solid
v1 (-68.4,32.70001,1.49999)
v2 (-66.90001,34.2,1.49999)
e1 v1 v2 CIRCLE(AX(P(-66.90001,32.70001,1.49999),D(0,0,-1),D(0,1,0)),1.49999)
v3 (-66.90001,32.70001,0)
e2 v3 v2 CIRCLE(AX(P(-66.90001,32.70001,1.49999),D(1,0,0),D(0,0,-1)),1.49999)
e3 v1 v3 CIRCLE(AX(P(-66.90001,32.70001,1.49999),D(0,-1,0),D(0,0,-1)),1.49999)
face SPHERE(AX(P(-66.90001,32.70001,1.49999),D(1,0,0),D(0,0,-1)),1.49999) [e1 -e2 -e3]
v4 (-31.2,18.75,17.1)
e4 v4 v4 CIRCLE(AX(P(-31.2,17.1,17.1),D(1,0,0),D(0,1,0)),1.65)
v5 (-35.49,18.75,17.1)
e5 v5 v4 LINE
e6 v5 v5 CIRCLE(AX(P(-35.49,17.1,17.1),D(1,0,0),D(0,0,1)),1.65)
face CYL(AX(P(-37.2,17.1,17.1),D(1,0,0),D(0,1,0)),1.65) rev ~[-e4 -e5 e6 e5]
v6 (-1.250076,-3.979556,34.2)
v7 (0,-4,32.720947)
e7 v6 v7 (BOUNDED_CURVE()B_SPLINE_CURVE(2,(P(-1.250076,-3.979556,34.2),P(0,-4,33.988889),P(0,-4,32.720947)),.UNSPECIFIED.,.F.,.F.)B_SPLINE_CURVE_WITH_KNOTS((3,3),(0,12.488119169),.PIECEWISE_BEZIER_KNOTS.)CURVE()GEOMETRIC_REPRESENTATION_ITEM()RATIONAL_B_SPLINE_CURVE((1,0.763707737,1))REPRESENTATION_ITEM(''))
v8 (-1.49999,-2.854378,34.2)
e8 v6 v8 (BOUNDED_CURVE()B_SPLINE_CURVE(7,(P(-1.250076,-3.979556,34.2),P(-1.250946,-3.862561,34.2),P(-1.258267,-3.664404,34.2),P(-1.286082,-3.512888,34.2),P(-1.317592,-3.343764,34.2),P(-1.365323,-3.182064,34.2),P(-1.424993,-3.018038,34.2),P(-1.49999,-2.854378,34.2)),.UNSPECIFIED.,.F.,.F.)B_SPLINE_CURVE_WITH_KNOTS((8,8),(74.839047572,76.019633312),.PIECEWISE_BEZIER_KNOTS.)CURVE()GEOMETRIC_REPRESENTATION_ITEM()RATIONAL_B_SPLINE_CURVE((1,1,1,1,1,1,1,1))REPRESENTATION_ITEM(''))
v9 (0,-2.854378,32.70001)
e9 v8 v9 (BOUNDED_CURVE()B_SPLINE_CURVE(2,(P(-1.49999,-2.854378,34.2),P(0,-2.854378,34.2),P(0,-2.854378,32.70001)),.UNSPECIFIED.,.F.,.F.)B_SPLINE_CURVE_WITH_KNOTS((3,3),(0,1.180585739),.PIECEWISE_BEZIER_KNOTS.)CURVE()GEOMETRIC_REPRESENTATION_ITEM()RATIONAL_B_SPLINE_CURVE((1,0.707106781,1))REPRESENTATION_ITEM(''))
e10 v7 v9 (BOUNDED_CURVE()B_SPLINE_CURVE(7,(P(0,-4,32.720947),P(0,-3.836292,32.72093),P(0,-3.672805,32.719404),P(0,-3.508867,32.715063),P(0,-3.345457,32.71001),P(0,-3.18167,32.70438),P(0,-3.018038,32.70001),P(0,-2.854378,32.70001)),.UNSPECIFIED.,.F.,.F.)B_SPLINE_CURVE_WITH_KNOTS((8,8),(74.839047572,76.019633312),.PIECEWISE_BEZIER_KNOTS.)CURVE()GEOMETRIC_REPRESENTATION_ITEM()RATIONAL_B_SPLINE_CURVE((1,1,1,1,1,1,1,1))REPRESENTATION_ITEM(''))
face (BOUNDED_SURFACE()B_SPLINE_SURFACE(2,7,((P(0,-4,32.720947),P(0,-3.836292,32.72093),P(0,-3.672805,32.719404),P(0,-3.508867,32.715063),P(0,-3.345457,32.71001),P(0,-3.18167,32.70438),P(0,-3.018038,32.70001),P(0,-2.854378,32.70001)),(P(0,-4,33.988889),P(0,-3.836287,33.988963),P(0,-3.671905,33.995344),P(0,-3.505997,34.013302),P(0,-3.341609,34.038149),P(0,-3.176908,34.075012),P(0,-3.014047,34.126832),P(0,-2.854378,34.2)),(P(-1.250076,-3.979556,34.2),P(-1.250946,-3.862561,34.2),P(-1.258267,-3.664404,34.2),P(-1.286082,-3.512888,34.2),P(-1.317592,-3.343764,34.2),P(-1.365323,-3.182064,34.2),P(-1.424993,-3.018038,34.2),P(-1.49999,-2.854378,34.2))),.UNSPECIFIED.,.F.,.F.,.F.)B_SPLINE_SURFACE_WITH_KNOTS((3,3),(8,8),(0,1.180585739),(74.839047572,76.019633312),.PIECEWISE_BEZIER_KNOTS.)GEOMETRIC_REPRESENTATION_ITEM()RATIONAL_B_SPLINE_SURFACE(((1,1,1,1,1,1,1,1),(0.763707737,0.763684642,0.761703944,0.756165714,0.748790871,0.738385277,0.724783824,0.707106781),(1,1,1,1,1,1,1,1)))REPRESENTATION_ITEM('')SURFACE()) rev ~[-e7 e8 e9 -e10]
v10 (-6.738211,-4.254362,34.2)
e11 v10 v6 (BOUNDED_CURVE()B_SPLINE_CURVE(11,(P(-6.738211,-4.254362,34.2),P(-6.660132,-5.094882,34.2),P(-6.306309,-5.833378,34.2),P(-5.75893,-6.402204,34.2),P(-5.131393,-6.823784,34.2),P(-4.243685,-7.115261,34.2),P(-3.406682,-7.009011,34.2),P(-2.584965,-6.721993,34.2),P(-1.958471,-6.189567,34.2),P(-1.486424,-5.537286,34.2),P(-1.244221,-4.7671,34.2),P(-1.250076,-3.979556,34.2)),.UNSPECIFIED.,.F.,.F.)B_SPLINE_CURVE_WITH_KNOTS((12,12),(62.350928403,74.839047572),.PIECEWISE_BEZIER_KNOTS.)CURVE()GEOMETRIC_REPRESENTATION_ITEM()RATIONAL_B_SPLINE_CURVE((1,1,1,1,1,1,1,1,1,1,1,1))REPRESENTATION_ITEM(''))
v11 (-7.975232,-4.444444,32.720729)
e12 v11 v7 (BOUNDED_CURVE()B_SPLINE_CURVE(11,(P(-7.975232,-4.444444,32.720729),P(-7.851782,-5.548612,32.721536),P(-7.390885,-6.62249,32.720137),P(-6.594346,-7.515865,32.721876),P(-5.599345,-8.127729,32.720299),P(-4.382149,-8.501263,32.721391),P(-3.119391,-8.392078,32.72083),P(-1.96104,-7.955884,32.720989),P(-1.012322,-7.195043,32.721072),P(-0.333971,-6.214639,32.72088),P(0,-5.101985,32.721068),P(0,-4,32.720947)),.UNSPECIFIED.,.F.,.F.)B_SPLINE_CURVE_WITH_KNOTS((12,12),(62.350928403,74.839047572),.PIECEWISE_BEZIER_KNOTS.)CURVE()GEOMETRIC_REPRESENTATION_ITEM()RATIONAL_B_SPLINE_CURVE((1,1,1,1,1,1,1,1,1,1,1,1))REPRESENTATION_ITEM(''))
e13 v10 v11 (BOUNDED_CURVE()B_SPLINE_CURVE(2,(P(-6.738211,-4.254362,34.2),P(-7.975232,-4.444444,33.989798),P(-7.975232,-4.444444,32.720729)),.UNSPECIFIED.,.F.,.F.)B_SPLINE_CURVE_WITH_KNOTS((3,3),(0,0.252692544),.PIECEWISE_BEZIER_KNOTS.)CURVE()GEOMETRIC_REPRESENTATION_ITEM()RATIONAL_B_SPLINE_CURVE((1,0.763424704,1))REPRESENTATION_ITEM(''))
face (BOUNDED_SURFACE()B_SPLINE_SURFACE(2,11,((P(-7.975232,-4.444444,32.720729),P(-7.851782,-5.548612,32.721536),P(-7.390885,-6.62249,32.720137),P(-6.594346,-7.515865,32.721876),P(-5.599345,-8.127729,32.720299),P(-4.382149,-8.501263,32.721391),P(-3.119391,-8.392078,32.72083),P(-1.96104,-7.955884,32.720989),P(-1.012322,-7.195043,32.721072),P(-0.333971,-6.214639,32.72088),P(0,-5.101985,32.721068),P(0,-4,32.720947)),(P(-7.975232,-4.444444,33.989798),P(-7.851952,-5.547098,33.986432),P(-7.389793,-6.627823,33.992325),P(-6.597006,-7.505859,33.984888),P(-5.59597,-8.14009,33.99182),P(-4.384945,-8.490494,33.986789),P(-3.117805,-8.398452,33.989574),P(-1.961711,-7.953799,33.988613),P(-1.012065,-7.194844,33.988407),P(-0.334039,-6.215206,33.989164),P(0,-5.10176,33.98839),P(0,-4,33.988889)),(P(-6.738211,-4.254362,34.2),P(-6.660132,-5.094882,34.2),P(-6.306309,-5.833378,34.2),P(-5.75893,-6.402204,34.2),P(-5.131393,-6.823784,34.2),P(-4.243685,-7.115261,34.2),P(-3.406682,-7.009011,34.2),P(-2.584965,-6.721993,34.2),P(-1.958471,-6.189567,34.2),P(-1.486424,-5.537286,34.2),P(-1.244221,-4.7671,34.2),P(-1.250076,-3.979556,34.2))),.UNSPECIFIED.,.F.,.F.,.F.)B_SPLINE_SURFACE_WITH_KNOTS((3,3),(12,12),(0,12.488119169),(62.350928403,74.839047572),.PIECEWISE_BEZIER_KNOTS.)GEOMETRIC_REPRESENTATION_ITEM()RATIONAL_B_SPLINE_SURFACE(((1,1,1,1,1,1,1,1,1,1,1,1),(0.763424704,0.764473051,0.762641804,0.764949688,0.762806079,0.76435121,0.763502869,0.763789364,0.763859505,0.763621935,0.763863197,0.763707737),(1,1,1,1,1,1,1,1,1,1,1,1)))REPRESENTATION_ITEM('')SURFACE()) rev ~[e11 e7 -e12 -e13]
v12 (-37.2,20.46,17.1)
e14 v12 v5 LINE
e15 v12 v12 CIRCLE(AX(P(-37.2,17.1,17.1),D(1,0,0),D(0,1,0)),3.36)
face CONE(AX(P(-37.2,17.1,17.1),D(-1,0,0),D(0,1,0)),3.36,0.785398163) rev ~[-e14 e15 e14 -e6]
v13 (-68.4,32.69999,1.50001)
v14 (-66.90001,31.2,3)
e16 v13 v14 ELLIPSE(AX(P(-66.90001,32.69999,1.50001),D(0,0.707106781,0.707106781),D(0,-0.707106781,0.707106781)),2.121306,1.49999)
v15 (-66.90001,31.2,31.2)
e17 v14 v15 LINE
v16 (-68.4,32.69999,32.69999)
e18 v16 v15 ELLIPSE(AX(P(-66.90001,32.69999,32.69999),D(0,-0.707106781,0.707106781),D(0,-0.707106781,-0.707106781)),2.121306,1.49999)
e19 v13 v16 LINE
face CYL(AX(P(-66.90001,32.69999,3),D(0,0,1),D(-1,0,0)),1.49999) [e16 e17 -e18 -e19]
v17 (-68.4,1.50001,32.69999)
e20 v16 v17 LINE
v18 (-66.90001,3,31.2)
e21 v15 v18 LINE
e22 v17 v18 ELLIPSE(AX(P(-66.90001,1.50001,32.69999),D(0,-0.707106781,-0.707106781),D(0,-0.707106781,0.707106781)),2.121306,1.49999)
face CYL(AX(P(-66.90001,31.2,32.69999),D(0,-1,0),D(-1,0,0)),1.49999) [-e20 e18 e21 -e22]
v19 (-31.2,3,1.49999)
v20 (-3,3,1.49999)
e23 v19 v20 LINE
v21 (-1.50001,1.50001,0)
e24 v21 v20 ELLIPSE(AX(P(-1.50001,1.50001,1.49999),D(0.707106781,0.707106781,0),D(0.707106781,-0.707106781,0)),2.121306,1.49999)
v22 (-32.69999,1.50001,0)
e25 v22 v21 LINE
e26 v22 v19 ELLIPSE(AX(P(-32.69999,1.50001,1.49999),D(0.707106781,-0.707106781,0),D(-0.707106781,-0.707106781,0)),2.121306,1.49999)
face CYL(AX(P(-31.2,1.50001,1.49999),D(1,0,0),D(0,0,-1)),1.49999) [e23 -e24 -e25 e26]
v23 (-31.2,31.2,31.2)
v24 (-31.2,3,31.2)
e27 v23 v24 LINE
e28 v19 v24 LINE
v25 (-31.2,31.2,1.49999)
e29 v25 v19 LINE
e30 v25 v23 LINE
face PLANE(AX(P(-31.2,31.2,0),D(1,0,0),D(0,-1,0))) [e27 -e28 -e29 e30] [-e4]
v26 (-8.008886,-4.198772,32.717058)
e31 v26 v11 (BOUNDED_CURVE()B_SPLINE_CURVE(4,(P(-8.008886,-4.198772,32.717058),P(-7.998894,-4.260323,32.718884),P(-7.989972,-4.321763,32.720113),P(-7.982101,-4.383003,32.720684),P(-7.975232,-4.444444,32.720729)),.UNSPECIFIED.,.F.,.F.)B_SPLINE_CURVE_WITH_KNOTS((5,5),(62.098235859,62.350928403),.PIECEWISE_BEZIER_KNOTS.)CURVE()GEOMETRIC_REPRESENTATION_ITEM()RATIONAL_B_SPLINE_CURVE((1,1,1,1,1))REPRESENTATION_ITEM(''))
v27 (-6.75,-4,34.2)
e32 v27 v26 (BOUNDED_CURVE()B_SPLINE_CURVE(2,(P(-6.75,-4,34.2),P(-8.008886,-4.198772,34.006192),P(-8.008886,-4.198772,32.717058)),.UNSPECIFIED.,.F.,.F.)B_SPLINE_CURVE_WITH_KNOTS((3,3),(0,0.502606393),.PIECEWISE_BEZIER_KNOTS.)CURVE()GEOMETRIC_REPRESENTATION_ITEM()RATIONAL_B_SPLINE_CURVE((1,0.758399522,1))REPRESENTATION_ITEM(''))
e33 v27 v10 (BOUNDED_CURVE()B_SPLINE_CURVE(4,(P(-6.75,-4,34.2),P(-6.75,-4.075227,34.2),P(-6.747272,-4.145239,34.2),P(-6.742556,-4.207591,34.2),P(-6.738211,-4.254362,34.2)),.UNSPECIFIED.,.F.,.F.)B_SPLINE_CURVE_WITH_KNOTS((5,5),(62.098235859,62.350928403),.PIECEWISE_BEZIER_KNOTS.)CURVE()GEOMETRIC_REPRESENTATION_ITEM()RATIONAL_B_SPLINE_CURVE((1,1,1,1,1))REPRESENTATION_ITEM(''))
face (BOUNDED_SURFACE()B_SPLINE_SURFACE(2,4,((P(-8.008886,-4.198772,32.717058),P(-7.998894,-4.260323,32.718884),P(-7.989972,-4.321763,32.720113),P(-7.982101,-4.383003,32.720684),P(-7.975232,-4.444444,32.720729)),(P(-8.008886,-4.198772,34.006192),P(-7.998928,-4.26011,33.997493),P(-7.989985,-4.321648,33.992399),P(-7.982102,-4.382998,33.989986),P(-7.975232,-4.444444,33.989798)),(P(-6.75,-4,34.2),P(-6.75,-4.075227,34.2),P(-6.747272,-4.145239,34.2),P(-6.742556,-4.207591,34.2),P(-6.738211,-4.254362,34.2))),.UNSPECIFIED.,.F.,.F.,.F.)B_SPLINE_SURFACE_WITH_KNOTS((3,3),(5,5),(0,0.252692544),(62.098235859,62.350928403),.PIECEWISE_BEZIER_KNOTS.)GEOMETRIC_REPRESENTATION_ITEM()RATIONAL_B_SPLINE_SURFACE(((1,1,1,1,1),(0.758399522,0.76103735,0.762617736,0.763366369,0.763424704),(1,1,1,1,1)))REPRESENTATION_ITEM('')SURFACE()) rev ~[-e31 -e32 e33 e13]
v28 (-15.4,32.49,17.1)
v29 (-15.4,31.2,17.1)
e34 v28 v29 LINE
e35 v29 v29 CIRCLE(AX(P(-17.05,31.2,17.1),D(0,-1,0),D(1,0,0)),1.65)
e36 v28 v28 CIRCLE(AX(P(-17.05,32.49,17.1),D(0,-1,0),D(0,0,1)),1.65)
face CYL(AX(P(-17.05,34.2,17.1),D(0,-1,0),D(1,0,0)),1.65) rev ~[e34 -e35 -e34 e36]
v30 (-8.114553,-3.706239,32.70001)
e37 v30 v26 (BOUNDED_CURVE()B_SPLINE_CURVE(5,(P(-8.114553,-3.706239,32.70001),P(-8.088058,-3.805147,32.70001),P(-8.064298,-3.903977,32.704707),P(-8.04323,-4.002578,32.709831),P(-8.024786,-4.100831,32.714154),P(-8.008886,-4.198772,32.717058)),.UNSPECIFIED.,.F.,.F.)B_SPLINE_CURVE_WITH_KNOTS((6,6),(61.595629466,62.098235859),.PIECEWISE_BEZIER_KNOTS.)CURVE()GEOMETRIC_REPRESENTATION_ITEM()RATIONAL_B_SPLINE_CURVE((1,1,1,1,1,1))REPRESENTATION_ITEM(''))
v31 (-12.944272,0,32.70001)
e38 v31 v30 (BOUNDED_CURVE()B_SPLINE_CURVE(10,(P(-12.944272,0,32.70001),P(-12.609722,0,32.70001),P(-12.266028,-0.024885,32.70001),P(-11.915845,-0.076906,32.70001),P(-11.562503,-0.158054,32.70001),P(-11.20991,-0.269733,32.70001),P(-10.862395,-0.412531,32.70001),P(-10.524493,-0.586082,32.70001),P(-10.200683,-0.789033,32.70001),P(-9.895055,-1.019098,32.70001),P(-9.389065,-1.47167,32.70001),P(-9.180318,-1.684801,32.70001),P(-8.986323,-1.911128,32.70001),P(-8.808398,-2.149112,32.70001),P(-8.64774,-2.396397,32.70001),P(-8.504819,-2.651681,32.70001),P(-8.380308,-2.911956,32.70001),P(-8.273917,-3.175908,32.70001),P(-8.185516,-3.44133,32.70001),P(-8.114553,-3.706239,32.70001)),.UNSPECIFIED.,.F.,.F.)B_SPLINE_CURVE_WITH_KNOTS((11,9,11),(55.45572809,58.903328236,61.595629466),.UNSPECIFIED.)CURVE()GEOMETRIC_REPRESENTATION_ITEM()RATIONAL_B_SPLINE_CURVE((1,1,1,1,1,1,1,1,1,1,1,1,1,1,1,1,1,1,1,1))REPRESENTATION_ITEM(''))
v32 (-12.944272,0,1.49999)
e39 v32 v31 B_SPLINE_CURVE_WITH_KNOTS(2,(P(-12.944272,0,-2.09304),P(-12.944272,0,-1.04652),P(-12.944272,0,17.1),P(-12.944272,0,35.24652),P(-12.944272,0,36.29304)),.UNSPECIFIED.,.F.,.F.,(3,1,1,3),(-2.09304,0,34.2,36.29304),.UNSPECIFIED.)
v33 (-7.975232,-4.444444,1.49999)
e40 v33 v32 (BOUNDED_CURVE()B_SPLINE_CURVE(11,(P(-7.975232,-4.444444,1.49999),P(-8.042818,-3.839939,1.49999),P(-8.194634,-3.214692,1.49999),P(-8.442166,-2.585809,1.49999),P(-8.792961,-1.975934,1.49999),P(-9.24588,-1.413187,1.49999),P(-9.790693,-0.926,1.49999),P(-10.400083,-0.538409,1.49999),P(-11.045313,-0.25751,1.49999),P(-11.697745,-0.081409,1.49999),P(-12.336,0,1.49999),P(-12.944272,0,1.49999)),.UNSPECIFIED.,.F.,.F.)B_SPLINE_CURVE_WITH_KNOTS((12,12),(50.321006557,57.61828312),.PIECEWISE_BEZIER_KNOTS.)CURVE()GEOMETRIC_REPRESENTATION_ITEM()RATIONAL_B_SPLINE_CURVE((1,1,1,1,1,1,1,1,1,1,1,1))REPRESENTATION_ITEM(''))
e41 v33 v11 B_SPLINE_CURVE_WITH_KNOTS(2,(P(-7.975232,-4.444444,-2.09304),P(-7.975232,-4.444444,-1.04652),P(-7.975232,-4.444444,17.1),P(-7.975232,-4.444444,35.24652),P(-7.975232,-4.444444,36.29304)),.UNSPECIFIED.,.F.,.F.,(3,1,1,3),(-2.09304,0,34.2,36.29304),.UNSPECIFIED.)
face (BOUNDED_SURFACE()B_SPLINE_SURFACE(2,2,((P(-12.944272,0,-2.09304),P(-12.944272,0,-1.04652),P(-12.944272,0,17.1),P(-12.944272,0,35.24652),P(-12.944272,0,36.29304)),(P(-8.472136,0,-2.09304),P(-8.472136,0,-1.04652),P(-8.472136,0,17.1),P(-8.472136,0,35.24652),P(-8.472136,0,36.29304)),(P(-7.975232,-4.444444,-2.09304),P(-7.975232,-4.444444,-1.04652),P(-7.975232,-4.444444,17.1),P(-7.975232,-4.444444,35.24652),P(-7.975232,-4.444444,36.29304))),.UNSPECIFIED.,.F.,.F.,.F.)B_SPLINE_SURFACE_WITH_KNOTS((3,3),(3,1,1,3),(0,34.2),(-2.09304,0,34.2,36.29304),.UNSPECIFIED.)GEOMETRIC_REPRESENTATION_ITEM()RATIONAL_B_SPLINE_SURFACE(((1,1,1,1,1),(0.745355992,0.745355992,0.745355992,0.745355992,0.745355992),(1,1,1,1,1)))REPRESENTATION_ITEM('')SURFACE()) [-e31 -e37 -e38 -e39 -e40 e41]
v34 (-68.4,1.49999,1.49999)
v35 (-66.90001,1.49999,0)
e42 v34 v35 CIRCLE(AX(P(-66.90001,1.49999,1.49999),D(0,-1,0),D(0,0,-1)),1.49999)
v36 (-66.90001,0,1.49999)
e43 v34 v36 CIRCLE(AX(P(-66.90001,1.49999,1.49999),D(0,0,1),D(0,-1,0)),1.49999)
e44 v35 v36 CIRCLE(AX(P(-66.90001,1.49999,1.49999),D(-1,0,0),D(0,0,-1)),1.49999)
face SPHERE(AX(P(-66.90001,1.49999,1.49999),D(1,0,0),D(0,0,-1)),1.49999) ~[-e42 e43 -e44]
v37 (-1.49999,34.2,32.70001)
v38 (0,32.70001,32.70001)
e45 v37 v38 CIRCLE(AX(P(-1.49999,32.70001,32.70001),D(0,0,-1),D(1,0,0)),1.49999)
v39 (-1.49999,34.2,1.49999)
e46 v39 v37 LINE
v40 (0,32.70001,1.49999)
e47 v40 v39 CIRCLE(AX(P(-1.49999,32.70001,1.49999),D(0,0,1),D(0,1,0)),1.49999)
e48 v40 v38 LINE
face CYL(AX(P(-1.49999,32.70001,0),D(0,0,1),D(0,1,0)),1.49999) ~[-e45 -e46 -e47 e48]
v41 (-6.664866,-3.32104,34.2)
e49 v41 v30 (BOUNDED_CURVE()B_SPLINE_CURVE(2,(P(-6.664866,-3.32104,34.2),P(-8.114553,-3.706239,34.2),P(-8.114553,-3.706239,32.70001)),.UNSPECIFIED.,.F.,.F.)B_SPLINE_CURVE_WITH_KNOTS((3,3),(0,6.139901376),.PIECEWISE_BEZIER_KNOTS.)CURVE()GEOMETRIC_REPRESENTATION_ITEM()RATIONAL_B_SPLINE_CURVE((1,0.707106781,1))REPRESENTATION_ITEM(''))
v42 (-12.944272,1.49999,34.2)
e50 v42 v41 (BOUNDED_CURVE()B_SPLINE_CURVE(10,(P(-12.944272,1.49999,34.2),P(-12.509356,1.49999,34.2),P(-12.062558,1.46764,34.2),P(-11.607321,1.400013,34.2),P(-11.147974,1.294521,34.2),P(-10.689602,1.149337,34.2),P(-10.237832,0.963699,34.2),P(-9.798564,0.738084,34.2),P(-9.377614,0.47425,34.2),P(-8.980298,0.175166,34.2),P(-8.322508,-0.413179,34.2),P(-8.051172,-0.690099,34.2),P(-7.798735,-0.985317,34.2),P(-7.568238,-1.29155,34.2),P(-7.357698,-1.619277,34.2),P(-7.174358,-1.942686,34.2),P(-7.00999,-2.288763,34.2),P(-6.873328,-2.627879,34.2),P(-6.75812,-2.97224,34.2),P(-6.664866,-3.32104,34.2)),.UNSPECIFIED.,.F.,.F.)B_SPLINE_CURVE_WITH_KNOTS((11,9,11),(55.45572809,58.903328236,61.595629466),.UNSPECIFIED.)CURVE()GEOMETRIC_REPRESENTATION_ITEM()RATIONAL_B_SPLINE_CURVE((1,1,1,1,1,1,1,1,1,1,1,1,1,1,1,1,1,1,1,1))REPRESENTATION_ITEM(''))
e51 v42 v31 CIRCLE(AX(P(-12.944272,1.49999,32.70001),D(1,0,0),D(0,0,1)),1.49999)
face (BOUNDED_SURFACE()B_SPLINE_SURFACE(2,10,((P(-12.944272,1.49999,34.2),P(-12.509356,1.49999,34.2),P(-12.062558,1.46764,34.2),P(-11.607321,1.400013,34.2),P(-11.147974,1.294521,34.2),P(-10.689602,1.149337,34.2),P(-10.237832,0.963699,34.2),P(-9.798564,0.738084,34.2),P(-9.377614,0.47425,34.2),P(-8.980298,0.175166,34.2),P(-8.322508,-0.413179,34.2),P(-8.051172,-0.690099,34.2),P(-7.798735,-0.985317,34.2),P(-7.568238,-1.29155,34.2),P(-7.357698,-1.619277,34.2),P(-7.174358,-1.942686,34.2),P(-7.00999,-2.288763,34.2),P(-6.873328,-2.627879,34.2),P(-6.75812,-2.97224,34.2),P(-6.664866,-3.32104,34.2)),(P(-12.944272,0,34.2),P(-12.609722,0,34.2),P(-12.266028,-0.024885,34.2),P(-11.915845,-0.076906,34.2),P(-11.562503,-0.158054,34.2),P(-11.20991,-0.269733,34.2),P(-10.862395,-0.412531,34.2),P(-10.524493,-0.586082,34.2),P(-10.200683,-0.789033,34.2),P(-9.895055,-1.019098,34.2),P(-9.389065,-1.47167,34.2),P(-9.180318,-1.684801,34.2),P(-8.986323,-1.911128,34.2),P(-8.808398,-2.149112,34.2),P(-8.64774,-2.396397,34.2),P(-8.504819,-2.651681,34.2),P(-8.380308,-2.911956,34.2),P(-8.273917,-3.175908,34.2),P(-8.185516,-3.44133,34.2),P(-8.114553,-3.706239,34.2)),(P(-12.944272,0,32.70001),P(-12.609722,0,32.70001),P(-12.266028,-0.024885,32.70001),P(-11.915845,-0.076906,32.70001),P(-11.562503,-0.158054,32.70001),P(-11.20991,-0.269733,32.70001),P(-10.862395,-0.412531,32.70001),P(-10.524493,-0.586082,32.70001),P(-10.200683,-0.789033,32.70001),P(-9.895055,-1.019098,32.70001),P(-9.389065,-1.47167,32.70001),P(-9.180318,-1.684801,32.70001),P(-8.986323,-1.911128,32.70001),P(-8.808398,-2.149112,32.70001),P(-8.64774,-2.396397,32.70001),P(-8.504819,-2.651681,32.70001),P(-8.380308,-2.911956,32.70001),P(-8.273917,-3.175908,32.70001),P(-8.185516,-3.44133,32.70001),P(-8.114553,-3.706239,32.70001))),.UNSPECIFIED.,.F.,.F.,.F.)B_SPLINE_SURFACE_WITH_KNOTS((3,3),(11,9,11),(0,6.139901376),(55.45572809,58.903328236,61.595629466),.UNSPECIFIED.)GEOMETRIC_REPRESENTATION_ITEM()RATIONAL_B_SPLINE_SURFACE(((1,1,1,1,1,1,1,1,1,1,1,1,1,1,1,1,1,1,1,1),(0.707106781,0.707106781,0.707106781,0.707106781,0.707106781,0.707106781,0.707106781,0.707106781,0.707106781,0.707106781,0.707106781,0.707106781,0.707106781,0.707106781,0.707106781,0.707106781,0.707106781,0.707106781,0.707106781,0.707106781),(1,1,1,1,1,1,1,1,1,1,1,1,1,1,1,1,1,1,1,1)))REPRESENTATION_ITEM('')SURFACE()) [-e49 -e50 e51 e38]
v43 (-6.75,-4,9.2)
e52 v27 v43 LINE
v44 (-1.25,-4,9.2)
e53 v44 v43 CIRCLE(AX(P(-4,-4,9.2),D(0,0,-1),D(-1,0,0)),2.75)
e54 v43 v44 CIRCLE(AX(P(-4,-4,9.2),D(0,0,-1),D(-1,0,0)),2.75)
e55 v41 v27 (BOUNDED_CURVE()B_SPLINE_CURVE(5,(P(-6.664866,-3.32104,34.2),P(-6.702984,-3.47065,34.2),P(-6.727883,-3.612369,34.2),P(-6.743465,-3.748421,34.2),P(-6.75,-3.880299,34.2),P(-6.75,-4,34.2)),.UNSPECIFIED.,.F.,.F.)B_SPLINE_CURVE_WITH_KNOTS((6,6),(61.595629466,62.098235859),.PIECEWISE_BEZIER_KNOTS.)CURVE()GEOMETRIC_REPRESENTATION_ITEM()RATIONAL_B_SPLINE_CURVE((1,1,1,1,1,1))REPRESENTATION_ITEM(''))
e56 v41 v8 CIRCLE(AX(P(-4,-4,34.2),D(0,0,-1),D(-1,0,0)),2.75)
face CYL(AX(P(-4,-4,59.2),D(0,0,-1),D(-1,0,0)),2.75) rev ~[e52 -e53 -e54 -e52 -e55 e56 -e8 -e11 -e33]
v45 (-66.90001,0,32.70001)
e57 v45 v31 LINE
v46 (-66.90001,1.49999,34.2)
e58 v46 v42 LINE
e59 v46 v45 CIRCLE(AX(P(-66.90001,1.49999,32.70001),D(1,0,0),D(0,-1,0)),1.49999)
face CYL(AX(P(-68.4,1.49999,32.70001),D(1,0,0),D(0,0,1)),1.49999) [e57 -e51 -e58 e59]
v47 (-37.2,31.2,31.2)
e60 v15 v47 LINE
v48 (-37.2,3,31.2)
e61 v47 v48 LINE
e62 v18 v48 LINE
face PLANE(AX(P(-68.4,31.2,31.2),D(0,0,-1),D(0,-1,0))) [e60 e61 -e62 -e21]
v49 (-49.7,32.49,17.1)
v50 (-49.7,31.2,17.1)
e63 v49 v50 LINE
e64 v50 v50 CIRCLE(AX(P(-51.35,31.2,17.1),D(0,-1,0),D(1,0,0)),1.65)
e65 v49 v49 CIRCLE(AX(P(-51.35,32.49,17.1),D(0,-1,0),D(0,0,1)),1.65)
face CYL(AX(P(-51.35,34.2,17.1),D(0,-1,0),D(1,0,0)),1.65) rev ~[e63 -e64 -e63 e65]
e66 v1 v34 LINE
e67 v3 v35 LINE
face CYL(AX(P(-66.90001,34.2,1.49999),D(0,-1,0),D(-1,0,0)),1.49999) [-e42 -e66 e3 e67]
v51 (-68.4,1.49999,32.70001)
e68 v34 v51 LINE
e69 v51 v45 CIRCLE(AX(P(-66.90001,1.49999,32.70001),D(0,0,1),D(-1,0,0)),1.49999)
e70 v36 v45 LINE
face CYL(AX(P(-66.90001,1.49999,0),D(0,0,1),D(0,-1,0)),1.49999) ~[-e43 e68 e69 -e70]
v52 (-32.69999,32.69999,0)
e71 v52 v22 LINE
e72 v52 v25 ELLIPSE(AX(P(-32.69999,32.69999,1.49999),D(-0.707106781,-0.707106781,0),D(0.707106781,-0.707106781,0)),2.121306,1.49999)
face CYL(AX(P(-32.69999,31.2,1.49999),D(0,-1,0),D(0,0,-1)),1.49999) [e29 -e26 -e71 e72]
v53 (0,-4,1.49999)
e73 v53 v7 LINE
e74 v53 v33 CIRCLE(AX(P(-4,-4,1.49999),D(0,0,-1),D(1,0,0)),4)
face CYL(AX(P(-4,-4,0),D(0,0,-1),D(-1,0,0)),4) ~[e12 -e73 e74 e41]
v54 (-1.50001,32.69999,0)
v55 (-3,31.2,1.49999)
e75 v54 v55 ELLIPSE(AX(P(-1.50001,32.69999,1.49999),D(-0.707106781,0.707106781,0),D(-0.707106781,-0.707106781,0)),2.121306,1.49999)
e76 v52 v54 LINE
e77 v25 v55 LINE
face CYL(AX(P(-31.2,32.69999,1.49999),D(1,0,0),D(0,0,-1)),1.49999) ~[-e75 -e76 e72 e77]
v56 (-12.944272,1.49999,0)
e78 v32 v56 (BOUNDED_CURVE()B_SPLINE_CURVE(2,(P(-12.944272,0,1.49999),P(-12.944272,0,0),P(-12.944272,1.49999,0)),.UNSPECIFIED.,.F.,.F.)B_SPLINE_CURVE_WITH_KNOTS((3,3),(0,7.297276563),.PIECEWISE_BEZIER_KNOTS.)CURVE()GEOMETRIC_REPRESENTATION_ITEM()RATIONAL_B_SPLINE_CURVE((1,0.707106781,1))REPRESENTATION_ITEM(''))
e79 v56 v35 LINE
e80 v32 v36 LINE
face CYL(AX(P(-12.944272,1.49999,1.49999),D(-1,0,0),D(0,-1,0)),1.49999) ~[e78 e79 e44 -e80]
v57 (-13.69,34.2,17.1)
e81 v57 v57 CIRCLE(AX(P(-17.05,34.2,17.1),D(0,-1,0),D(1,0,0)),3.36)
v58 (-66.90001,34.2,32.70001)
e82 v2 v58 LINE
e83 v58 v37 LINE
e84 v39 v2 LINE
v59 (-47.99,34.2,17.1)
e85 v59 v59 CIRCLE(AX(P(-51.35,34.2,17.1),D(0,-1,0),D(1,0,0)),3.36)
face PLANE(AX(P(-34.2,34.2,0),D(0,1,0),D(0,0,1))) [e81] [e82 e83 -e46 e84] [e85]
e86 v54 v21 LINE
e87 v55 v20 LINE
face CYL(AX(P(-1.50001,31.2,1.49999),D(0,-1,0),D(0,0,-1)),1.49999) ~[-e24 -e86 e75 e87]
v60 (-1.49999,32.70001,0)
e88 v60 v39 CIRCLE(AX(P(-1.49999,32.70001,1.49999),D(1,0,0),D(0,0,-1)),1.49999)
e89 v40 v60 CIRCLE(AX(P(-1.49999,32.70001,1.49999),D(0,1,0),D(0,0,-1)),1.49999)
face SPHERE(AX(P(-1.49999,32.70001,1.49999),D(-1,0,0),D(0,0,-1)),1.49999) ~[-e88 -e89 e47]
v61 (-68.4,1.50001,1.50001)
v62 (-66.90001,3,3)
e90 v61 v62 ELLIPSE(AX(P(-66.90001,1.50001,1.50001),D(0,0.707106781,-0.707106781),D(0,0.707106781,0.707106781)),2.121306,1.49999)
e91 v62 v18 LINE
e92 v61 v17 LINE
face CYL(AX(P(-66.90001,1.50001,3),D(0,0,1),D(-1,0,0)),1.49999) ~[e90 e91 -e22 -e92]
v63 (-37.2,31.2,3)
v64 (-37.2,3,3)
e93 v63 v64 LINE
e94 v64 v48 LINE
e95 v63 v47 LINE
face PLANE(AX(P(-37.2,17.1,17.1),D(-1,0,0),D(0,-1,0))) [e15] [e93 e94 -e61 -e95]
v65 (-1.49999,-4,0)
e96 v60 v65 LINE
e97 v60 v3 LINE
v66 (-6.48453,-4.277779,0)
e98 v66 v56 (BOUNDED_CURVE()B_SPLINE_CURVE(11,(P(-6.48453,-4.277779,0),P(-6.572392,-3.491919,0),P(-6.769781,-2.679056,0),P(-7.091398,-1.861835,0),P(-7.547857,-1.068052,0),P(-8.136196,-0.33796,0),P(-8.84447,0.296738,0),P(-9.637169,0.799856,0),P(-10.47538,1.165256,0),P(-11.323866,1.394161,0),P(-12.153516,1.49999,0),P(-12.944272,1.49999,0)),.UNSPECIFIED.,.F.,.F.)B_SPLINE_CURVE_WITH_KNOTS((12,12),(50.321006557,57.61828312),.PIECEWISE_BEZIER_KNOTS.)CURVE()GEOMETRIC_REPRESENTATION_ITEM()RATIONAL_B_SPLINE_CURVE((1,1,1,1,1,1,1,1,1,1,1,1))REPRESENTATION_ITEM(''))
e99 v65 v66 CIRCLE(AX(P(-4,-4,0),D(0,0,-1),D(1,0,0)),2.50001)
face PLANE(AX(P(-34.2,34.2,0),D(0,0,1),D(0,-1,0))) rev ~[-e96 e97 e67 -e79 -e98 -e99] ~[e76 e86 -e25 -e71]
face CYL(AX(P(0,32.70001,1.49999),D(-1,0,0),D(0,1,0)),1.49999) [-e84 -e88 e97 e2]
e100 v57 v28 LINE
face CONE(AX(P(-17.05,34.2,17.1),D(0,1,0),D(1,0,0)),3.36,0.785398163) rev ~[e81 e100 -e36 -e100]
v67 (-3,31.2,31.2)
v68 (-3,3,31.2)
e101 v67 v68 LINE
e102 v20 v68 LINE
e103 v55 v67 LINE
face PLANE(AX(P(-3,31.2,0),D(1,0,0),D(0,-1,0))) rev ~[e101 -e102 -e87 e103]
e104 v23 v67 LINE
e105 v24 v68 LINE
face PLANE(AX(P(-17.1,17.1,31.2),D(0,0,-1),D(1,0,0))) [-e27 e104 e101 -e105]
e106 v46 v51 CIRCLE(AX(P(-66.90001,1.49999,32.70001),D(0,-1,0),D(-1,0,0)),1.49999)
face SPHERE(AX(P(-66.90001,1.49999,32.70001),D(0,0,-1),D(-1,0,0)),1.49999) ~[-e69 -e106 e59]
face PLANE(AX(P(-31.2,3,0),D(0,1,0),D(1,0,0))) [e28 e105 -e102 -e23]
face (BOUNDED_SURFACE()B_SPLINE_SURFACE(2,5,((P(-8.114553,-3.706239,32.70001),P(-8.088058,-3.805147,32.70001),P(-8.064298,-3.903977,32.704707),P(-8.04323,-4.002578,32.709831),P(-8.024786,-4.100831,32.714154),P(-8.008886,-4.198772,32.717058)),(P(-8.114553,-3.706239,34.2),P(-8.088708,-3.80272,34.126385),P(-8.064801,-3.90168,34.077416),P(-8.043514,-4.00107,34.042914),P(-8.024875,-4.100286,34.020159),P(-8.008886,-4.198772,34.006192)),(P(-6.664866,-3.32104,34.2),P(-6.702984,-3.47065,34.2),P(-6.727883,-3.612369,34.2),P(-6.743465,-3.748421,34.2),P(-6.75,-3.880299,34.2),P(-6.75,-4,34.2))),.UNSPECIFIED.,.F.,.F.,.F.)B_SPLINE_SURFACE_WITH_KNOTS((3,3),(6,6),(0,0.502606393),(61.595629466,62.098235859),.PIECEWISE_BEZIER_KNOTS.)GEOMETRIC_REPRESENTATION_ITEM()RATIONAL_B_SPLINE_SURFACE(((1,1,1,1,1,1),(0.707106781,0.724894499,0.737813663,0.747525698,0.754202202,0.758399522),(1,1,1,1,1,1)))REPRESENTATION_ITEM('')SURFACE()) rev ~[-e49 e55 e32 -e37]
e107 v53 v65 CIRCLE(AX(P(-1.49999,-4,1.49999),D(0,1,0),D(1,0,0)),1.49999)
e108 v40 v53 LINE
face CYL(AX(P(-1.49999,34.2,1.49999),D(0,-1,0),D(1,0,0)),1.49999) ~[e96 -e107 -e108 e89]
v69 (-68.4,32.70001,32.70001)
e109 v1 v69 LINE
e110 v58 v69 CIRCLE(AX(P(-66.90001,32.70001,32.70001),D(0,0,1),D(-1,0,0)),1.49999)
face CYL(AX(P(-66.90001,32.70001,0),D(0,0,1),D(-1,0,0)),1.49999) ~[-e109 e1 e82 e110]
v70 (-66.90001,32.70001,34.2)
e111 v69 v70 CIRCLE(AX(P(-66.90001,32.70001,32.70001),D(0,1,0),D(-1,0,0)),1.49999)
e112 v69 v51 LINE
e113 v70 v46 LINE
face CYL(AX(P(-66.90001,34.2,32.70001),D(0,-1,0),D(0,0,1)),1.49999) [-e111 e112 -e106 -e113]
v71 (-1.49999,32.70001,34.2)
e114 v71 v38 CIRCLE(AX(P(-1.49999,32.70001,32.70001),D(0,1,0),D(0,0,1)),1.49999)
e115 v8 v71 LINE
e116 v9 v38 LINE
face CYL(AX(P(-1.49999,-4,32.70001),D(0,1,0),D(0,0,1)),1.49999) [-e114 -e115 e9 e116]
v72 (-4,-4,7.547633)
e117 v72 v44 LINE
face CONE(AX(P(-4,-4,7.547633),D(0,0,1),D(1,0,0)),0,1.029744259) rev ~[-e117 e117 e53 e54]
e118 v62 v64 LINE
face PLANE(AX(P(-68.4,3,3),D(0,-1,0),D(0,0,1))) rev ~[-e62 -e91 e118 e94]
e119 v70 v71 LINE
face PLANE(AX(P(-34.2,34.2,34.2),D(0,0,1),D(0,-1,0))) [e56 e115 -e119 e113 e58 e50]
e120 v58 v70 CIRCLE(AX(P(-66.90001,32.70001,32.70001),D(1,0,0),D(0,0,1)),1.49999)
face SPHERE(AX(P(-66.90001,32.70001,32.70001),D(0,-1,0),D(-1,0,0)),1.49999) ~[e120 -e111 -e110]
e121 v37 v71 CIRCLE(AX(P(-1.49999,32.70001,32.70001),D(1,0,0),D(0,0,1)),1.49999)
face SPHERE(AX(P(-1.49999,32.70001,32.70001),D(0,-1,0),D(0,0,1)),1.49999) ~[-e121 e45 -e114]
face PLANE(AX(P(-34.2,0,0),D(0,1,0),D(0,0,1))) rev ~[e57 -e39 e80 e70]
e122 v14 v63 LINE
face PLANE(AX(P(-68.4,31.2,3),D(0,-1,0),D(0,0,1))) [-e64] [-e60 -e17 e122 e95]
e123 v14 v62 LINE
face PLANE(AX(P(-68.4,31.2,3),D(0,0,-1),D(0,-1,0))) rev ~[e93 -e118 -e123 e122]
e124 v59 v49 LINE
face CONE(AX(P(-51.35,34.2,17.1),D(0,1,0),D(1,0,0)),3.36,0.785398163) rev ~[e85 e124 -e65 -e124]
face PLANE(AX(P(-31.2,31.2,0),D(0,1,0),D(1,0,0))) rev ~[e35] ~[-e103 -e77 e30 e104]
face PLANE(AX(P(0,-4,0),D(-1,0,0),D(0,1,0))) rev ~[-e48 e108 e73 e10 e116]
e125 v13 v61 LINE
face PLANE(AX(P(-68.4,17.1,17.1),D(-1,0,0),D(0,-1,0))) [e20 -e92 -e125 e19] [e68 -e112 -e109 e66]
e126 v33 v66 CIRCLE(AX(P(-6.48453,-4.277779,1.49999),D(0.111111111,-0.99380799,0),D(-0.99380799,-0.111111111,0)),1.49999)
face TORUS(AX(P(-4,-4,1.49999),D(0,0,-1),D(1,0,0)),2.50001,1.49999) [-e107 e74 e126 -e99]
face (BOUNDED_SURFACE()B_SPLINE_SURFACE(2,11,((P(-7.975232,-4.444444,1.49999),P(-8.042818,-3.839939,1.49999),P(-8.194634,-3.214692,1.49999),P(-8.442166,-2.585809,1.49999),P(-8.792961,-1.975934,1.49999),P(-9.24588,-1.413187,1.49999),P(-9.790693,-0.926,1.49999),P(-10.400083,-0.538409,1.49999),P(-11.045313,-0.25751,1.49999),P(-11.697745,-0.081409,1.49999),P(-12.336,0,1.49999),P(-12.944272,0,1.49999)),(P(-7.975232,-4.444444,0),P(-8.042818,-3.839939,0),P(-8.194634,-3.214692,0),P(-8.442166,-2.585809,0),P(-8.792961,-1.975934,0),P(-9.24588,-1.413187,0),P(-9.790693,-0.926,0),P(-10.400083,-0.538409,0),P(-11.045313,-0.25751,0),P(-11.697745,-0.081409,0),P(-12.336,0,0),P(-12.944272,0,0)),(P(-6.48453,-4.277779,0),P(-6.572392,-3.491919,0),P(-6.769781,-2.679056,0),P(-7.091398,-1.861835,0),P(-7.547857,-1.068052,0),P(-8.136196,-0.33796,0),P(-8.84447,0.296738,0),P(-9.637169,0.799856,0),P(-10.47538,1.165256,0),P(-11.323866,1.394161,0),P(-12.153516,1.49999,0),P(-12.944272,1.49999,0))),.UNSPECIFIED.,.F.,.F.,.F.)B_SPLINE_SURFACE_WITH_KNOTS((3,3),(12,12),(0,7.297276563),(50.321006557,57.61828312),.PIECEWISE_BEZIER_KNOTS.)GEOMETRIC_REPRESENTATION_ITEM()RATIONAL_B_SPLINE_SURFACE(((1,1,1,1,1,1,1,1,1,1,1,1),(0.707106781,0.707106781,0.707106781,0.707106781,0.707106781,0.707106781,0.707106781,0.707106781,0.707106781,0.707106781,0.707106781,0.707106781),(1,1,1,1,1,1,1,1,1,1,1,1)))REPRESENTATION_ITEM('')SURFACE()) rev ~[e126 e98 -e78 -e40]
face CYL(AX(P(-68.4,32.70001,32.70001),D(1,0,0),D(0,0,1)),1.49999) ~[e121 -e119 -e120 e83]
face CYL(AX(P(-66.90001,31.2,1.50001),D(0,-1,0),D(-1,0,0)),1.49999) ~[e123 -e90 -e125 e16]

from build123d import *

# Parameters (mm, degrees)
F1_DEPTH             = 34.2
F2_W                 = 34.2
F2_H                 = 34.2
F3_DEPTH             = 34.2
F4_W                 = 28.2
F4_H                 = 28.2
F5_DEPTH             = 31.2
F8_D                 = 3.3
F8_DEPTH             = 25
F8_CSINK_D           = 6.72
F8_CSINK_ANGLE       = 90
F8_TIP               = 0.9914200214
F8_ON_F7_D           = 3.3
F8_ON_F7_DEPTH       = 25
F8_ON_F7_CSINK_D     = 6.72
F8_ON_F7_CSINK_ANGLE = 90
F8_ON_F7_TIP         = 0.9914200214
F10_D                = 5.5
F10_DEPTH            = 25
F10_TIP              = 1.6523667023
F11_R                = 5
F12_W                = 28.2
F12_H                = 28.2
F13_DEPTH            = 31.2
F14_R                = 1.49999


# Not quite as in the source:
# - a fillet or chamfer is up to 0.001 mm smaller than in the source, because OpenCascade refuses the exact size


with BuildPart() as f1:
    # F0 (on Top) → F1 (new body)
    with BuildSketch(Plane.XY):
        with BuildLine():
            Line((0, 0), (-8, 0))
            Line((-8, 0), (-8, -4))
            ThreePointArc((-8, -4), (-4, -8), (0, -4))
            Line((0, -4), (0, 0))
        make_face()
        Polygon((-34.2, 0), (-8, 0), (0, 0), (0, 34.2), (-34.2, 34.2), align=None)
    extrude(amount=F1_DEPTH)

    # F2 (on face) → F3 (join)
    with BuildSketch(Plane(origin=(-34.2, 0, 0), x_dir=(0, -1, 0), z_dir=(-1, 0, 0))):
        with Locations((-17.1, 17.1)):
            Rectangle(F2_W, F2_H)
    extrude(amount=F3_DEPTH)

    # F4 (on face) → F5 (cut)
    with BuildSketch(Plane(origin=(-68.4, 0, 0), x_dir=(0, -1, 0), z_dir=(-1, 0, 0))):
        with Locations((-17.1, 17.1)):
            Rectangle(F4_W, F4_H)
    extrude(amount=-F5_DEPTH, mode=Mode.SUBTRACT)

    # F8
    with Locations(Plane(origin=(0, 34.2, 0), x_dir=(-1, 0, 0), z_dir=(0, 1, 0))):
        with Locations((17.05, 17.1), (51.35, 17.1)):
            CounterSinkHole(F8_D / 2, F8_CSINK_D / 2, depth=F8_DEPTH, counter_sink_angle=F8_CSINK_ANGLE)
            with Locations((0, 0, -(F8_DEPTH + F8_TIP / 2))):  # 118° drill point
                Cone(0, F8_D / 2, F8_TIP, mode=Mode.SUBTRACT)

    # F8 on F7
    with Locations(Plane(origin=(-37.2, 0, 0), x_dir=(0, -1, 0), z_dir=(-1, 0, 0))):
        with Locations((-17.1, 17.1)):
            CounterSinkHole(F8_ON_F7_D / 2, F8_ON_F7_CSINK_D / 2, depth=F8_ON_F7_DEPTH, counter_sink_angle=F8_ON_F7_CSINK_ANGLE)
            with Locations((0, 0, -(F8_ON_F7_DEPTH + F8_ON_F7_TIP / 2))):  # 118° drill point
                Cone(0, F8_ON_F7_D / 2, F8_ON_F7_TIP, mode=Mode.SUBTRACT)

    # F10
    with Locations(Plane.XY.offset(34.2)):
        with Locations((-4, -4)):
            Hole(F10_D / 2, depth=F10_DEPTH)
            with Locations((0, 0, -(F10_DEPTH + F10_TIP / 2))):  # 118° drill point
                Cone(0, F10_D / 2, F10_TIP, mode=Mode.SUBTRACT)

    # F11
    f11_edges = [f1.edges().sort_by_distance(p)[0] for p in [
        (-8, 0, 17.1),
    ]]
    fillet(f11_edges, radius=F11_R)

    # F12 (on face) → F13 (cut)
    with BuildSketch(Plane(origin=(0, 0, 0), x_dir=(1, 0, 0), z_dir=(0, 0, -1))):
        with Locations((-17.1, -17.1)):
            Rectangle(F12_W, F12_H)
    extrude(amount=-F13_DEPTH, mode=Mode.SUBTRACT)

    # F14 (radius 1.5 in the source; OpenCascade refuses exactly that, so slightly less here)
    f14_edges = [f1.edges().sort_by_distance(p)[0] for p in [
        (-31.2, 17.1, 0),
        (-17.1, 3, 0),
        (-3, 17.1, 0),
        (-17.1, 31.2, 0),
        (-34.2, 34.2, 0),
        (-40.672136, 0, 0),
        (0, 15.1, 0),
        (-68.4, 17.1, 0),
        (-68.4, 0, 17.1),
        (-68.4, 17.1, 34.2),
        (-68.4, 34.2, 17.1),
        (-68.4, 17.1, 31.2),
        (-68.4, 3, 17.1),
        (-68.4, 17.1, 3),
        (-68.4, 31.2, 17.1),
        (-40.672136, 0, 34.2),
        (-34.2, 34.2, 34.2),
        (0, 15.1, 34.2),
        (0, 34.2, 17.1),
    ]]
    fillet(f14_edges, radius=F14_R)


solid = f1.part
